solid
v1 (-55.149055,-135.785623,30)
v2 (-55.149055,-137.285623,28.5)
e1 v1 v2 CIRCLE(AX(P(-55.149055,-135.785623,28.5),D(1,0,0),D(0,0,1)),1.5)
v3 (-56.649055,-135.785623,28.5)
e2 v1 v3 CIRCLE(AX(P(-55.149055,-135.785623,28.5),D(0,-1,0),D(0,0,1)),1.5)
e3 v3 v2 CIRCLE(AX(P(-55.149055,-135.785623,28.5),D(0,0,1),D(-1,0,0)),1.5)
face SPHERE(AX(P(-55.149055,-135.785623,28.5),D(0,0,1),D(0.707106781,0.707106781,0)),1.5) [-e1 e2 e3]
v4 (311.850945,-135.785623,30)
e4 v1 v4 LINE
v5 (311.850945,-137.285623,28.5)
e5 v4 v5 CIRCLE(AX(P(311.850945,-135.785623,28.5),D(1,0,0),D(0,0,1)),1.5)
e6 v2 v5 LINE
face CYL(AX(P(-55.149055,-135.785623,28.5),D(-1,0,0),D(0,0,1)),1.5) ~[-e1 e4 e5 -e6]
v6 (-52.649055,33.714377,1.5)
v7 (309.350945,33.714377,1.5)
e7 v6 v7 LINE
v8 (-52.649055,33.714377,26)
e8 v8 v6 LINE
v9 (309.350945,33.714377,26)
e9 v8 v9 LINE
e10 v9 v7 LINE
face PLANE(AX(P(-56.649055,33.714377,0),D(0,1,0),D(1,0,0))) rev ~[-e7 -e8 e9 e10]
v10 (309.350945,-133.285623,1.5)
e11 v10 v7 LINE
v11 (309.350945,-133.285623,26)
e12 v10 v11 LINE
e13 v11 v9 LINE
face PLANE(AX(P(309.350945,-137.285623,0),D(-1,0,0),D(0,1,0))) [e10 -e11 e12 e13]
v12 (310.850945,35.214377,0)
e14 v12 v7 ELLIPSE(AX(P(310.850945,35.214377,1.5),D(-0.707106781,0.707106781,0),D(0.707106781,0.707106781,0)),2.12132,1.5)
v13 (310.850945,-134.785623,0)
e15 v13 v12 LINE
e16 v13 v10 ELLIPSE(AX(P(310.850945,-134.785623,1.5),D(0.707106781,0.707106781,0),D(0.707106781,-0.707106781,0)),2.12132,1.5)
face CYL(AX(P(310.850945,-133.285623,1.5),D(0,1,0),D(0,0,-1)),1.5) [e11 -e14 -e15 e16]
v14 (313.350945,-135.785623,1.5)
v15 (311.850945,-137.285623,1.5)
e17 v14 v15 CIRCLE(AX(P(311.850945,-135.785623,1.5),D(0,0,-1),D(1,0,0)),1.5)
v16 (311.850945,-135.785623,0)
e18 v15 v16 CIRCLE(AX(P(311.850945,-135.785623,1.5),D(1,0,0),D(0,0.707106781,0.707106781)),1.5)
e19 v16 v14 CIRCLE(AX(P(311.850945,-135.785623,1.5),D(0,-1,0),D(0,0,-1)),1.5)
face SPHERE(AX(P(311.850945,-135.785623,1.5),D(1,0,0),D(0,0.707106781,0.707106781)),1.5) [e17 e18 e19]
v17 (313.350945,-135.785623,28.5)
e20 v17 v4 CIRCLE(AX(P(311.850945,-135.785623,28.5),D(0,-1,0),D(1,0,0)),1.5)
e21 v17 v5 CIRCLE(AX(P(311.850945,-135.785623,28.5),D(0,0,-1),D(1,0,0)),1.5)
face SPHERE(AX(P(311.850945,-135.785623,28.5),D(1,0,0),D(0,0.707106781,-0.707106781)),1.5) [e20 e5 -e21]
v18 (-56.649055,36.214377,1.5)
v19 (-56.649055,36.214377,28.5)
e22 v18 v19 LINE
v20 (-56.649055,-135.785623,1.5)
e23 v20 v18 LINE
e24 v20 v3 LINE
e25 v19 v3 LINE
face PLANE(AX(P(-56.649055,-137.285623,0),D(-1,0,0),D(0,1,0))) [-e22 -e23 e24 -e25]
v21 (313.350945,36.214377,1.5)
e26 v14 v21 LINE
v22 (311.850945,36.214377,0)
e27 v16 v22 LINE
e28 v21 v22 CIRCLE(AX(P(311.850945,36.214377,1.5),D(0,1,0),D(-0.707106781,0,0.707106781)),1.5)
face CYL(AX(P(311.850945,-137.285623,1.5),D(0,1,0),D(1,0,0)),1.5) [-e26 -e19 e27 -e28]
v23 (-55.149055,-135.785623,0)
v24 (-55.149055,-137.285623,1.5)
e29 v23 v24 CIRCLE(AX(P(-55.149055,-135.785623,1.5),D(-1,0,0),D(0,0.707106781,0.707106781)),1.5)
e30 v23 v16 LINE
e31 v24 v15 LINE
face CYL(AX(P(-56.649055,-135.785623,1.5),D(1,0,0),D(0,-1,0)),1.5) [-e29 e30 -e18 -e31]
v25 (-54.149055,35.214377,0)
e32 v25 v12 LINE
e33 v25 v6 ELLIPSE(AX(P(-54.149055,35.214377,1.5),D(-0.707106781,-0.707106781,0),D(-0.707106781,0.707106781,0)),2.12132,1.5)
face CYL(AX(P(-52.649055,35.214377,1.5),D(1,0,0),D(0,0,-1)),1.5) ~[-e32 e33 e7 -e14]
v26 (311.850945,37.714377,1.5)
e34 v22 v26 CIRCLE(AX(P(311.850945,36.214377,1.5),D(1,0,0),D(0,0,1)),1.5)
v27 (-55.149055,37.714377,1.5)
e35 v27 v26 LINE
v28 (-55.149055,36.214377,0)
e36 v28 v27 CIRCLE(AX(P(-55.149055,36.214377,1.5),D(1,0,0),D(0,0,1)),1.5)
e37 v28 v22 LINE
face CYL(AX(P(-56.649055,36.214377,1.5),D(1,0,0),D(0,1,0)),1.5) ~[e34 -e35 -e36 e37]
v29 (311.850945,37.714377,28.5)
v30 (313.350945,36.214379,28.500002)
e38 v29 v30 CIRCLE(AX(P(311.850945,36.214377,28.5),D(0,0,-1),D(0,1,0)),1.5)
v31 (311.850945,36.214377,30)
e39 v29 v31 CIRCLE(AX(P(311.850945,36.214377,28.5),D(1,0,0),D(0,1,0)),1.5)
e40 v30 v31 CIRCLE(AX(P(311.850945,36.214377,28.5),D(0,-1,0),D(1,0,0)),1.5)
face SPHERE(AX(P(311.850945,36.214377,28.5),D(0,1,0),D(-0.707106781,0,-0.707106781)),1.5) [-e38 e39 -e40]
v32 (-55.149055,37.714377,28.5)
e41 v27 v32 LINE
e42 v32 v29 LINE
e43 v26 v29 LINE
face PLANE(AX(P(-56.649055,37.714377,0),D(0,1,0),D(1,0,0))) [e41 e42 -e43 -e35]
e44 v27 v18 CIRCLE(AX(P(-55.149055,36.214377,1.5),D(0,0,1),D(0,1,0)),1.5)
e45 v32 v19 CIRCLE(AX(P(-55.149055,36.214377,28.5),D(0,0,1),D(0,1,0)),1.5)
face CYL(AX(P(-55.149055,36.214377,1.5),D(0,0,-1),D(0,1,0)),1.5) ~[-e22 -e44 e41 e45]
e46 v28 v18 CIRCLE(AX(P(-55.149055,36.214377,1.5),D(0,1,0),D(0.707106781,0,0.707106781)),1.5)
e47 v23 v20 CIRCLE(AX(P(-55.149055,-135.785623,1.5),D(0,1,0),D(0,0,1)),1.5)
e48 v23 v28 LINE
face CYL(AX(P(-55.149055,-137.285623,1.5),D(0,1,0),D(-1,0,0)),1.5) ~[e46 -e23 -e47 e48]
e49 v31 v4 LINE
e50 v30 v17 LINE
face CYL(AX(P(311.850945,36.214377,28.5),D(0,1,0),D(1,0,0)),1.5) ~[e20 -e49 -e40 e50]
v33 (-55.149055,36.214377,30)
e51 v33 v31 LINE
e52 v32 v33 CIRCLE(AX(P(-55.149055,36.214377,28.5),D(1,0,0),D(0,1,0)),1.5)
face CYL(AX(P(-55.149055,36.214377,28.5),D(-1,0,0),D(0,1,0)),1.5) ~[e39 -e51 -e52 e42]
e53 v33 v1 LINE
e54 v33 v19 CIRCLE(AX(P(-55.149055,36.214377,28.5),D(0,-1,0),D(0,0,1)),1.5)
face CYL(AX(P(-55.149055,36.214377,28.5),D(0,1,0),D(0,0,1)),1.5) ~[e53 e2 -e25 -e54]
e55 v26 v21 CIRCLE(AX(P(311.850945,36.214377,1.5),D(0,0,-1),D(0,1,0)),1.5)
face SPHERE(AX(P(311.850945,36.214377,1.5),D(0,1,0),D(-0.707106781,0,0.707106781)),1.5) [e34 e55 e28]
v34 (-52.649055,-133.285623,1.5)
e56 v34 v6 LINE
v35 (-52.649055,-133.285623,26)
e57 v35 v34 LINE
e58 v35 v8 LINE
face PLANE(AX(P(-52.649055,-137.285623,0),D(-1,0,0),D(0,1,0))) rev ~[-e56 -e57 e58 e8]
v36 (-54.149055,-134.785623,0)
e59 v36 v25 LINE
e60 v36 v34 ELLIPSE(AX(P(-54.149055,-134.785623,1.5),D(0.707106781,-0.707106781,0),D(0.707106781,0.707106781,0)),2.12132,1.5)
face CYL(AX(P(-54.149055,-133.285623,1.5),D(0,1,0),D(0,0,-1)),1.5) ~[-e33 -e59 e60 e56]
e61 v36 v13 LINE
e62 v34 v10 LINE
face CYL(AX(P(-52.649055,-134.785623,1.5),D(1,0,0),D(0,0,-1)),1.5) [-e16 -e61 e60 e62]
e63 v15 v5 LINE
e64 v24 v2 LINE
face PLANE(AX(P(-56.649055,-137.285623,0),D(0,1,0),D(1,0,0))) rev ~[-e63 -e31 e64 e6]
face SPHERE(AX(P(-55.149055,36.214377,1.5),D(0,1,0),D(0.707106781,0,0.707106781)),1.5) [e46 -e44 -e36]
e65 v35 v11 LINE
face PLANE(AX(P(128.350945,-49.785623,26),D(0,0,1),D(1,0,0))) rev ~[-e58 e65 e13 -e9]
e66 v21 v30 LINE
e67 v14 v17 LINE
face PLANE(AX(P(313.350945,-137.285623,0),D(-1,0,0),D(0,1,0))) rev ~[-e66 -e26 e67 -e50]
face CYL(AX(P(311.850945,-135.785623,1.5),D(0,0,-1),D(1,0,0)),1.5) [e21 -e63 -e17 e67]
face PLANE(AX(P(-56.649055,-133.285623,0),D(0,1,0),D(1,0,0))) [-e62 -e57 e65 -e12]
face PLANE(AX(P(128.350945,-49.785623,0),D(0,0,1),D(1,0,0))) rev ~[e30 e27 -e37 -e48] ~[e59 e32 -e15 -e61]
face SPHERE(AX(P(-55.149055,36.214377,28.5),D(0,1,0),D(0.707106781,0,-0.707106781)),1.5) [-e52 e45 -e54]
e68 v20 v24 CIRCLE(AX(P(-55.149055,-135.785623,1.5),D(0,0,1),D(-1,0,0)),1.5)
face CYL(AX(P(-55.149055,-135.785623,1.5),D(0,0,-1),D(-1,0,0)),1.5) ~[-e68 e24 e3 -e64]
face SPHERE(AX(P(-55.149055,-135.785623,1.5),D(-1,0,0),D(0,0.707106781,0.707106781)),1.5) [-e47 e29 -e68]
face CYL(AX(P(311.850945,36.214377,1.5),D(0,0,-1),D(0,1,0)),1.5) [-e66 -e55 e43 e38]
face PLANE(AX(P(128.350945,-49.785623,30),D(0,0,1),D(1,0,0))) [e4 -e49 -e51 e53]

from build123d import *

# Parameters (mm, degrees)
F0_W         = 370
F0_H         = 175
F1_DEPTH     = 30
F2_T         = -4
F3_R         = 1.5
F4_T1_DEPTH  = 172
F4_T3_DEPTH  = 27
F4_T5_DEPTH  = 367
F4_S9_W      = 1.5
F4_S9_H      = 1.5
F4_T10_DEPTH = 1.5
F4_S15_W     = 1.5
F4_S15_H     = 1.5
F4_T16_DEPTH = 1.5
F4_S21_W     = 1.5
F4_S21_H     = 1.5
F4_T22_DEPTH = 1.5
F4_S27_W     = 1.5
F4_S27_H     = 1.5
F4_T28_DEPTH = 1.5
F4_S33_W     = 1.5
F4_S33_H     = 1.5
F4_T34_DEPTH = 1.5
F4_S39_W     = 1.5
F4_S39_H     = 1.5
F4_T40_DEPTH = 1.5
F4_S45_W     = 1.5
F4_S45_H     = 1.5
F4_T46_DEPTH = 1.5
F4_S51_W     = 1.5
F4_S51_H     = 1.5
F4_T52_DEPTH = 1.5


# Not quite as in the source:
# - a fillet or chamfer that OpenCascade refuses, or shapes differently, is made with other operations: its cross-section is extruded or revolved along the edge and cut away or added


with BuildPart() as f1:
    # F0 (on Top) → F1 (new body)
    with BuildSketch(Plane.XY):
        with Locations((128.3509446681, -49.7856229544)):
            Rectangle(F0_W, F0_H)
    extrude(amount=F1_DEPTH)

    # F2
    f2_openings = [f1.faces().sort_by_distance(p)[0] for p in [
        (128.350945, -49.785623, 0),
    ]]
    offset(amount=F2_T, openings=f2_openings)

    # F3
    f3_edges = [f1.edges().sort_by_distance(p)[0] for p in [
        (128.350945, -137.285623, 0),
        (-56.649055, -49.785623, 0),
        (-52.649055, -49.785623, 0),
        (128.350945, -133.285623, 0),
        (128.350945, 37.714377, 0),
        (128.350945, 33.714377, 0),
        (309.350945, -49.785623, 0),
        (313.350945, -49.785623, 0),
    ]]
    fillet(f3_edges, radius=F3_R)

    # F4: fillet of radius 1.5 on 8 edges, made by hand

    # F4_s2 → F4_t1 (cut)
    with BuildSketch(Plane.XZ.offset(-36.2143770456)):
        with BuildLine():
            ThreePointArc((-55.1490553319, 30), (-56.2097155037, 29.5606601718), (-56.6490553319, 28.5))
            Line((-56.6490553319, 28.5), (-56.6490553319, 30))
            Line((-56.6490553319, 30), (-55.1490553319, 30))
        make_face()
        with BuildLine():
            ThreePointArc((313.3509446681, 28.5), (312.9116048398, 29.5606601718), (311.8509446681, 30))
            Line((311.8509446681, 30), (313.3509446681, 30))
            Line((313.3509446681, 30), (313.3509446681, 28.5))
        make_face()
    extrude(amount=F4_T1_DEPTH, mode=Mode.SUBTRACT)

    # F4_s4 → F4_t3 (cut)
    with BuildSketch(Plane.XY.offset(1.5)):
        with BuildLine():
            ThreePointArc((-55.1490553319, 37.7143770456), (-56.2097155037, 37.2750372174), (-56.6490553319, 36.2143770456))
            Line((-56.6490553319, 36.2143770456), (-56.6490553319, 37.7143770456))
            Line((-56.6490553319, 37.7143770456), (-55.1490553319, 37.7143770456))
        make_face()
        with BuildLine():
            ThreePointArc((-56.6490553319, -135.7856229544), (-56.2097155037, -136.8462831261), (-55.1490553319, -137.2856229544))
            Line((-55.1490553319, -137.2856229544), (-56.6490553319, -137.2856229544))
            Line((-56.6490553319, -137.2856229544), (-56.6490553319, -135.7856229544))
        make_face()
        with BuildLine():
            ThreePointArc((313.3509446681, -135.7856229544), (312.9116048398, -136.8462831261), (311.8509446681, -137.2856229544))
            Line((311.8509446681, -137.2856229544), (313.3509446681, -137.2856229544))
            Line((313.3509446681, -137.2856229544), (313.3509446681, -135.7856229544))
        make_face()
        with BuildLine():
            ThreePointArc((311.8509446681, 37.7143770456), (312.9116048398, 37.2750372174), (313.3509446681, 36.2143770456))
            Line((313.3509446681, 36.2143770456), (313.3509446681, 37.7143770456))
            Line((313.3509446681, 37.7143770456), (311.8509446681, 37.7143770456))
        make_face()
    extrude(amount=F4_T3_DEPTH, mode=Mode.SUBTRACT)

    # F4_s6 → F4_t5 (cut)
    with BuildSketch(Plane.YZ.offset(-55.1490553319)):
        with BuildLine():
            ThreePointArc((-135.7856229544, 30), (-136.8462831261, 29.5606601718), (-137.2856229544, 28.5))
            Line((-137.2856229544, 28.5), (-137.2856229544, 30))
            Line((-137.2856229544, 30), (-135.7856229544, 30))
        make_face()
        with BuildLine():
            ThreePointArc((37.7143770456, 28.5), (37.2750372174, 29.5606601718), (36.2143770456, 30))
            Line((36.2143770456, 30), (37.7143770456, 30))
            Line((37.7143770456, 30), (37.7143770456, 28.5))
        make_face()
    extrude(amount=F4_T5_DEPTH, mode=Mode.SUBTRACT)


with BuildPart() as f4_tool8:
    # F4_s9 → F4_t10 (new body)
    with BuildSketch(Plane.XZ.offset(-36.2143770456)):
        with Locations((312.6009446681, 0.75)):
            Rectangle(F4_S9_W, F4_S9_H)
    extrude(amount=-F4_T10_DEPTH)

    # F4_s11 → F4_t12 (revolve, cut)
    with BuildSketch(Plane(origin=(311.8509446681, 36.2143770456, 1.5), x_dir=(-0.7071067812, 0, 0.7071067812), z_dir=(-0.7071067812, 0, -0.7071067812))):
        with BuildLine():
            ThreePointArc((0, -1.5), (1.5, 0), (0, 1.5))
            Line((0, 1.5), (0, -1.5))
        make_face()
    revolve(axis=Axis((311.8509446681, 36.2143770456, 1.5), (0, 1, 0)), mode=Mode.SUBTRACT)


with BuildPart() as f1_1:
    add(f1.part)

    # F4_t7: cut F4_tool8
    add(f4_tool8.part, mode=Mode.SUBTRACT)


with BuildPart() as f4_tool14:
    # F4_s15 → F4_t16 (new body)
    with BuildSketch(Plane.YZ.offset(311.8509446681)):
        with Locations((-136.5356229544, 0.75)):
            Rectangle(F4_S15_W, F4_S15_H)
    extrude(amount=F4_T16_DEPTH)

    # F4_s17 → F4_t18 (revolve, cut)
    with BuildSketch(Plane(origin=(311.8509446681, -135.7856229544, 1.5), x_dir=(0, 0.7071067812, 0.7071067812), z_dir=(0, 0.7071067812, -0.7071067812))):
        with BuildLine():
            ThreePointArc((0, -1.5), (1.5, 0), (0, 1.5))
            Line((0, 1.5), (0, -1.5))
        make_face()
    revolve(axis=Axis((311.8509446681, -135.7856229544, 1.5), (1, 0, 0)), mode=Mode.SUBTRACT)


with BuildPart() as f1_2:
    add(f1_1.part)

    # F4_t13: cut F4_tool14
    add(f4_tool14.part, mode=Mode.SUBTRACT)


with BuildPart() as f4_tool20:
    # F4_s21 → F4_t22 (new body)
    with BuildSketch(Plane.YZ.offset(-55.1490553319)):
        with Locations((-136.5356229544, 0.75)):
            Rectangle(F4_S21_W, F4_S21_H)
    extrude(amount=-F4_T22_DEPTH)

    # F4_s23 → F4_t24 (revolve, cut)
    with BuildSketch(Plane(origin=(-55.1490553319, -135.7856229544, 1.5), x_dir=(0, 0.7071067812, 0.7071067812), z_dir=(0, -0.7071067812, 0.7071067812))):
        with BuildLine():
            ThreePointArc((0, -1.5), (1.5, 0), (0, 1.5))
            Line((0, 1.5), (0, -1.5))
        make_face()
    revolve(axis=Axis((-55.1490553319, -135.7856229544, 1.5), (-1, 0, 0)), mode=Mode.SUBTRACT)


with BuildPart() as f1_3:
    add(f1_2.part)

    # F4_t19: cut F4_tool20
    add(f4_tool20.part, mode=Mode.SUBTRACT)


with BuildPart() as f4_tool26:
    # F4_s27 → F4_t28 (new body)
    with BuildSketch(Plane.XZ.offset(-36.2143770456)):
        with Locations((-55.8990553319, 0.75)):
            Rectangle(F4_S27_W, F4_S27_H)
    extrude(amount=-F4_T28_DEPTH)

    # F4_s29 → F4_t30 (revolve, cut)
    with BuildSketch(Plane(origin=(-55.1490553319, 36.2143770456, 1.5), x_dir=(0.7071067812, 0, 0.7071067812), z_dir=(-0.7071067812, 0, 0.7071067812))):
        with BuildLine():
            ThreePointArc((0, -1.5), (1.5, 0), (0, 1.5))
            Line((0, 1.5), (0, -1.5))
        make_face()
    revolve(axis=Axis((-55.1490553319, 36.2143770456, 1.5), (0, 1, 0)), mode=Mode.SUBTRACT)


with BuildPart() as f1_4:
    add(f1_3.part)

    # F4_t25: cut F4_tool26
    add(f4_tool26.part, mode=Mode.SUBTRACT)


with BuildPart() as f4_tool32:
    # F4_s33 → F4_t34 (new body)
    with BuildSketch(Plane.XZ.offset(-36.2143770456)):
        with Locations((-55.8990553319, 29.25)):
            Rectangle(F4_S33_W, F4_S33_H)
    extrude(amount=-F4_T34_DEPTH)

    # F4_s35 → F4_t36 (revolve, cut)
    with BuildSketch(Plane(origin=(-55.1490553319, 36.2143770456, 28.5), x_dir=(0.7071067812, 0, -0.7071067812), z_dir=(0.7071067812, 0, 0.7071067812))):
        with BuildLine():
            ThreePointArc((0, -1.5), (1.5, 0), (0, 1.5))
            Line((0, 1.5), (0, -1.5))
        make_face()
    revolve(axis=Axis((-55.1490553319, 36.2143770456, 28.5), (0, 1, 0)), mode=Mode.SUBTRACT)


with BuildPart() as f1_5:
    add(f1_4.part)

    # F4_t31: cut F4_tool32
    add(f4_tool32.part, mode=Mode.SUBTRACT)


with BuildPart() as f4_tool38:
    # F4_s39 → F4_t40 (new body)
    with BuildSketch(Plane.XY.offset(28.5)):
        with Locations((-55.8990553319, -136.5356229544)):
            Rectangle(F4_S39_W, F4_S39_H)
    extrude(amount=F4_T40_DEPTH)

    # F4_s41 → F4_t42 (revolve, cut)
    with BuildSketch(Plane(origin=(-55.1490553319, -135.7856229544, 28.5), x_dir=(0.7071067812, 0.7071067812, 0), z_dir=(0.7071067812, -0.7071067812, 0))):
        with BuildLine():
            ThreePointArc((0, -1.5), (1.5, 0), (0, 1.5))
            Line((0, 1.5), (0, -1.5))
        make_face()
    revolve(axis=Axis((-55.1490553319, -135.7856229544, 28.5), (0, 0, 1)), mode=Mode.SUBTRACT)


with BuildPart() as f1_6:
    add(f1_5.part)

    # F4_t37: cut F4_tool38
    add(f4_tool38.part, mode=Mode.SUBTRACT)


with BuildPart() as f4_tool44:
    # F4_s45 → F4_t46 (new body)
    with BuildSketch(Plane.YZ.offset(311.8509446681)):
        with Locations((-136.5356229544, 29.25)):
            Rectangle(F4_S45_W, F4_S45_H)
    extrude(amount=F4_T46_DEPTH)

    # F4_s47 → F4_t48 (revolve, cut)
    with BuildSketch(Plane(origin=(311.8509446681, -135.7856229544, 28.5), x_dir=(0, 0.7071067812, -0.7071067812), z_dir=(0, -0.7071067812, -0.7071067812))):
        with BuildLine():
            ThreePointArc((0, -1.5), (1.5, 0), (0, 1.5))
            Line((0, 1.5), (0, -1.5))
        make_face()
    revolve(axis=Axis((311.8509446681, -135.7856229544, 28.5), (1, 0, 0)), mode=Mode.SUBTRACT)


with BuildPart() as f1_7:
    add(f1_6.part)

    # F4_t43: cut F4_tool44
    add(f4_tool44.part, mode=Mode.SUBTRACT)


with BuildPart() as f4_tool50:
    # F4_s51 → F4_t52 (new body)
    with BuildSketch(Plane.XZ.offset(-36.2143770456)):
        with Locations((312.6009446681, 29.25)):
            Rectangle(F4_S51_W, F4_S51_H)
    extrude(amount=-F4_T52_DEPTH)

    # F4_s53 → F4_t54 (revolve, cut)
    with BuildSketch(Plane(origin=(311.8509446681, 36.2143770456, 28.5), x_dir=(-0.7071067812, 0, -0.7071067812), z_dir=(0.7071067812, 0, -0.7071067812))):
        with BuildLine():
            ThreePointArc((0, -1.5), (1.5, 0), (0, 1.5))
            Line((0, 1.5), (0, -1.5))
        make_face()
    revolve(axis=Axis((311.8509446681, 36.2143770456, 28.5), (0, 1, 0)), mode=Mode.SUBTRACT)


with BuildPart() as f1_8:
    add(f1_7.part)

    # F4_t49: cut F4_tool50
    add(f4_tool50.part, mode=Mode.SUBTRACT)


solid = f1_8.part
